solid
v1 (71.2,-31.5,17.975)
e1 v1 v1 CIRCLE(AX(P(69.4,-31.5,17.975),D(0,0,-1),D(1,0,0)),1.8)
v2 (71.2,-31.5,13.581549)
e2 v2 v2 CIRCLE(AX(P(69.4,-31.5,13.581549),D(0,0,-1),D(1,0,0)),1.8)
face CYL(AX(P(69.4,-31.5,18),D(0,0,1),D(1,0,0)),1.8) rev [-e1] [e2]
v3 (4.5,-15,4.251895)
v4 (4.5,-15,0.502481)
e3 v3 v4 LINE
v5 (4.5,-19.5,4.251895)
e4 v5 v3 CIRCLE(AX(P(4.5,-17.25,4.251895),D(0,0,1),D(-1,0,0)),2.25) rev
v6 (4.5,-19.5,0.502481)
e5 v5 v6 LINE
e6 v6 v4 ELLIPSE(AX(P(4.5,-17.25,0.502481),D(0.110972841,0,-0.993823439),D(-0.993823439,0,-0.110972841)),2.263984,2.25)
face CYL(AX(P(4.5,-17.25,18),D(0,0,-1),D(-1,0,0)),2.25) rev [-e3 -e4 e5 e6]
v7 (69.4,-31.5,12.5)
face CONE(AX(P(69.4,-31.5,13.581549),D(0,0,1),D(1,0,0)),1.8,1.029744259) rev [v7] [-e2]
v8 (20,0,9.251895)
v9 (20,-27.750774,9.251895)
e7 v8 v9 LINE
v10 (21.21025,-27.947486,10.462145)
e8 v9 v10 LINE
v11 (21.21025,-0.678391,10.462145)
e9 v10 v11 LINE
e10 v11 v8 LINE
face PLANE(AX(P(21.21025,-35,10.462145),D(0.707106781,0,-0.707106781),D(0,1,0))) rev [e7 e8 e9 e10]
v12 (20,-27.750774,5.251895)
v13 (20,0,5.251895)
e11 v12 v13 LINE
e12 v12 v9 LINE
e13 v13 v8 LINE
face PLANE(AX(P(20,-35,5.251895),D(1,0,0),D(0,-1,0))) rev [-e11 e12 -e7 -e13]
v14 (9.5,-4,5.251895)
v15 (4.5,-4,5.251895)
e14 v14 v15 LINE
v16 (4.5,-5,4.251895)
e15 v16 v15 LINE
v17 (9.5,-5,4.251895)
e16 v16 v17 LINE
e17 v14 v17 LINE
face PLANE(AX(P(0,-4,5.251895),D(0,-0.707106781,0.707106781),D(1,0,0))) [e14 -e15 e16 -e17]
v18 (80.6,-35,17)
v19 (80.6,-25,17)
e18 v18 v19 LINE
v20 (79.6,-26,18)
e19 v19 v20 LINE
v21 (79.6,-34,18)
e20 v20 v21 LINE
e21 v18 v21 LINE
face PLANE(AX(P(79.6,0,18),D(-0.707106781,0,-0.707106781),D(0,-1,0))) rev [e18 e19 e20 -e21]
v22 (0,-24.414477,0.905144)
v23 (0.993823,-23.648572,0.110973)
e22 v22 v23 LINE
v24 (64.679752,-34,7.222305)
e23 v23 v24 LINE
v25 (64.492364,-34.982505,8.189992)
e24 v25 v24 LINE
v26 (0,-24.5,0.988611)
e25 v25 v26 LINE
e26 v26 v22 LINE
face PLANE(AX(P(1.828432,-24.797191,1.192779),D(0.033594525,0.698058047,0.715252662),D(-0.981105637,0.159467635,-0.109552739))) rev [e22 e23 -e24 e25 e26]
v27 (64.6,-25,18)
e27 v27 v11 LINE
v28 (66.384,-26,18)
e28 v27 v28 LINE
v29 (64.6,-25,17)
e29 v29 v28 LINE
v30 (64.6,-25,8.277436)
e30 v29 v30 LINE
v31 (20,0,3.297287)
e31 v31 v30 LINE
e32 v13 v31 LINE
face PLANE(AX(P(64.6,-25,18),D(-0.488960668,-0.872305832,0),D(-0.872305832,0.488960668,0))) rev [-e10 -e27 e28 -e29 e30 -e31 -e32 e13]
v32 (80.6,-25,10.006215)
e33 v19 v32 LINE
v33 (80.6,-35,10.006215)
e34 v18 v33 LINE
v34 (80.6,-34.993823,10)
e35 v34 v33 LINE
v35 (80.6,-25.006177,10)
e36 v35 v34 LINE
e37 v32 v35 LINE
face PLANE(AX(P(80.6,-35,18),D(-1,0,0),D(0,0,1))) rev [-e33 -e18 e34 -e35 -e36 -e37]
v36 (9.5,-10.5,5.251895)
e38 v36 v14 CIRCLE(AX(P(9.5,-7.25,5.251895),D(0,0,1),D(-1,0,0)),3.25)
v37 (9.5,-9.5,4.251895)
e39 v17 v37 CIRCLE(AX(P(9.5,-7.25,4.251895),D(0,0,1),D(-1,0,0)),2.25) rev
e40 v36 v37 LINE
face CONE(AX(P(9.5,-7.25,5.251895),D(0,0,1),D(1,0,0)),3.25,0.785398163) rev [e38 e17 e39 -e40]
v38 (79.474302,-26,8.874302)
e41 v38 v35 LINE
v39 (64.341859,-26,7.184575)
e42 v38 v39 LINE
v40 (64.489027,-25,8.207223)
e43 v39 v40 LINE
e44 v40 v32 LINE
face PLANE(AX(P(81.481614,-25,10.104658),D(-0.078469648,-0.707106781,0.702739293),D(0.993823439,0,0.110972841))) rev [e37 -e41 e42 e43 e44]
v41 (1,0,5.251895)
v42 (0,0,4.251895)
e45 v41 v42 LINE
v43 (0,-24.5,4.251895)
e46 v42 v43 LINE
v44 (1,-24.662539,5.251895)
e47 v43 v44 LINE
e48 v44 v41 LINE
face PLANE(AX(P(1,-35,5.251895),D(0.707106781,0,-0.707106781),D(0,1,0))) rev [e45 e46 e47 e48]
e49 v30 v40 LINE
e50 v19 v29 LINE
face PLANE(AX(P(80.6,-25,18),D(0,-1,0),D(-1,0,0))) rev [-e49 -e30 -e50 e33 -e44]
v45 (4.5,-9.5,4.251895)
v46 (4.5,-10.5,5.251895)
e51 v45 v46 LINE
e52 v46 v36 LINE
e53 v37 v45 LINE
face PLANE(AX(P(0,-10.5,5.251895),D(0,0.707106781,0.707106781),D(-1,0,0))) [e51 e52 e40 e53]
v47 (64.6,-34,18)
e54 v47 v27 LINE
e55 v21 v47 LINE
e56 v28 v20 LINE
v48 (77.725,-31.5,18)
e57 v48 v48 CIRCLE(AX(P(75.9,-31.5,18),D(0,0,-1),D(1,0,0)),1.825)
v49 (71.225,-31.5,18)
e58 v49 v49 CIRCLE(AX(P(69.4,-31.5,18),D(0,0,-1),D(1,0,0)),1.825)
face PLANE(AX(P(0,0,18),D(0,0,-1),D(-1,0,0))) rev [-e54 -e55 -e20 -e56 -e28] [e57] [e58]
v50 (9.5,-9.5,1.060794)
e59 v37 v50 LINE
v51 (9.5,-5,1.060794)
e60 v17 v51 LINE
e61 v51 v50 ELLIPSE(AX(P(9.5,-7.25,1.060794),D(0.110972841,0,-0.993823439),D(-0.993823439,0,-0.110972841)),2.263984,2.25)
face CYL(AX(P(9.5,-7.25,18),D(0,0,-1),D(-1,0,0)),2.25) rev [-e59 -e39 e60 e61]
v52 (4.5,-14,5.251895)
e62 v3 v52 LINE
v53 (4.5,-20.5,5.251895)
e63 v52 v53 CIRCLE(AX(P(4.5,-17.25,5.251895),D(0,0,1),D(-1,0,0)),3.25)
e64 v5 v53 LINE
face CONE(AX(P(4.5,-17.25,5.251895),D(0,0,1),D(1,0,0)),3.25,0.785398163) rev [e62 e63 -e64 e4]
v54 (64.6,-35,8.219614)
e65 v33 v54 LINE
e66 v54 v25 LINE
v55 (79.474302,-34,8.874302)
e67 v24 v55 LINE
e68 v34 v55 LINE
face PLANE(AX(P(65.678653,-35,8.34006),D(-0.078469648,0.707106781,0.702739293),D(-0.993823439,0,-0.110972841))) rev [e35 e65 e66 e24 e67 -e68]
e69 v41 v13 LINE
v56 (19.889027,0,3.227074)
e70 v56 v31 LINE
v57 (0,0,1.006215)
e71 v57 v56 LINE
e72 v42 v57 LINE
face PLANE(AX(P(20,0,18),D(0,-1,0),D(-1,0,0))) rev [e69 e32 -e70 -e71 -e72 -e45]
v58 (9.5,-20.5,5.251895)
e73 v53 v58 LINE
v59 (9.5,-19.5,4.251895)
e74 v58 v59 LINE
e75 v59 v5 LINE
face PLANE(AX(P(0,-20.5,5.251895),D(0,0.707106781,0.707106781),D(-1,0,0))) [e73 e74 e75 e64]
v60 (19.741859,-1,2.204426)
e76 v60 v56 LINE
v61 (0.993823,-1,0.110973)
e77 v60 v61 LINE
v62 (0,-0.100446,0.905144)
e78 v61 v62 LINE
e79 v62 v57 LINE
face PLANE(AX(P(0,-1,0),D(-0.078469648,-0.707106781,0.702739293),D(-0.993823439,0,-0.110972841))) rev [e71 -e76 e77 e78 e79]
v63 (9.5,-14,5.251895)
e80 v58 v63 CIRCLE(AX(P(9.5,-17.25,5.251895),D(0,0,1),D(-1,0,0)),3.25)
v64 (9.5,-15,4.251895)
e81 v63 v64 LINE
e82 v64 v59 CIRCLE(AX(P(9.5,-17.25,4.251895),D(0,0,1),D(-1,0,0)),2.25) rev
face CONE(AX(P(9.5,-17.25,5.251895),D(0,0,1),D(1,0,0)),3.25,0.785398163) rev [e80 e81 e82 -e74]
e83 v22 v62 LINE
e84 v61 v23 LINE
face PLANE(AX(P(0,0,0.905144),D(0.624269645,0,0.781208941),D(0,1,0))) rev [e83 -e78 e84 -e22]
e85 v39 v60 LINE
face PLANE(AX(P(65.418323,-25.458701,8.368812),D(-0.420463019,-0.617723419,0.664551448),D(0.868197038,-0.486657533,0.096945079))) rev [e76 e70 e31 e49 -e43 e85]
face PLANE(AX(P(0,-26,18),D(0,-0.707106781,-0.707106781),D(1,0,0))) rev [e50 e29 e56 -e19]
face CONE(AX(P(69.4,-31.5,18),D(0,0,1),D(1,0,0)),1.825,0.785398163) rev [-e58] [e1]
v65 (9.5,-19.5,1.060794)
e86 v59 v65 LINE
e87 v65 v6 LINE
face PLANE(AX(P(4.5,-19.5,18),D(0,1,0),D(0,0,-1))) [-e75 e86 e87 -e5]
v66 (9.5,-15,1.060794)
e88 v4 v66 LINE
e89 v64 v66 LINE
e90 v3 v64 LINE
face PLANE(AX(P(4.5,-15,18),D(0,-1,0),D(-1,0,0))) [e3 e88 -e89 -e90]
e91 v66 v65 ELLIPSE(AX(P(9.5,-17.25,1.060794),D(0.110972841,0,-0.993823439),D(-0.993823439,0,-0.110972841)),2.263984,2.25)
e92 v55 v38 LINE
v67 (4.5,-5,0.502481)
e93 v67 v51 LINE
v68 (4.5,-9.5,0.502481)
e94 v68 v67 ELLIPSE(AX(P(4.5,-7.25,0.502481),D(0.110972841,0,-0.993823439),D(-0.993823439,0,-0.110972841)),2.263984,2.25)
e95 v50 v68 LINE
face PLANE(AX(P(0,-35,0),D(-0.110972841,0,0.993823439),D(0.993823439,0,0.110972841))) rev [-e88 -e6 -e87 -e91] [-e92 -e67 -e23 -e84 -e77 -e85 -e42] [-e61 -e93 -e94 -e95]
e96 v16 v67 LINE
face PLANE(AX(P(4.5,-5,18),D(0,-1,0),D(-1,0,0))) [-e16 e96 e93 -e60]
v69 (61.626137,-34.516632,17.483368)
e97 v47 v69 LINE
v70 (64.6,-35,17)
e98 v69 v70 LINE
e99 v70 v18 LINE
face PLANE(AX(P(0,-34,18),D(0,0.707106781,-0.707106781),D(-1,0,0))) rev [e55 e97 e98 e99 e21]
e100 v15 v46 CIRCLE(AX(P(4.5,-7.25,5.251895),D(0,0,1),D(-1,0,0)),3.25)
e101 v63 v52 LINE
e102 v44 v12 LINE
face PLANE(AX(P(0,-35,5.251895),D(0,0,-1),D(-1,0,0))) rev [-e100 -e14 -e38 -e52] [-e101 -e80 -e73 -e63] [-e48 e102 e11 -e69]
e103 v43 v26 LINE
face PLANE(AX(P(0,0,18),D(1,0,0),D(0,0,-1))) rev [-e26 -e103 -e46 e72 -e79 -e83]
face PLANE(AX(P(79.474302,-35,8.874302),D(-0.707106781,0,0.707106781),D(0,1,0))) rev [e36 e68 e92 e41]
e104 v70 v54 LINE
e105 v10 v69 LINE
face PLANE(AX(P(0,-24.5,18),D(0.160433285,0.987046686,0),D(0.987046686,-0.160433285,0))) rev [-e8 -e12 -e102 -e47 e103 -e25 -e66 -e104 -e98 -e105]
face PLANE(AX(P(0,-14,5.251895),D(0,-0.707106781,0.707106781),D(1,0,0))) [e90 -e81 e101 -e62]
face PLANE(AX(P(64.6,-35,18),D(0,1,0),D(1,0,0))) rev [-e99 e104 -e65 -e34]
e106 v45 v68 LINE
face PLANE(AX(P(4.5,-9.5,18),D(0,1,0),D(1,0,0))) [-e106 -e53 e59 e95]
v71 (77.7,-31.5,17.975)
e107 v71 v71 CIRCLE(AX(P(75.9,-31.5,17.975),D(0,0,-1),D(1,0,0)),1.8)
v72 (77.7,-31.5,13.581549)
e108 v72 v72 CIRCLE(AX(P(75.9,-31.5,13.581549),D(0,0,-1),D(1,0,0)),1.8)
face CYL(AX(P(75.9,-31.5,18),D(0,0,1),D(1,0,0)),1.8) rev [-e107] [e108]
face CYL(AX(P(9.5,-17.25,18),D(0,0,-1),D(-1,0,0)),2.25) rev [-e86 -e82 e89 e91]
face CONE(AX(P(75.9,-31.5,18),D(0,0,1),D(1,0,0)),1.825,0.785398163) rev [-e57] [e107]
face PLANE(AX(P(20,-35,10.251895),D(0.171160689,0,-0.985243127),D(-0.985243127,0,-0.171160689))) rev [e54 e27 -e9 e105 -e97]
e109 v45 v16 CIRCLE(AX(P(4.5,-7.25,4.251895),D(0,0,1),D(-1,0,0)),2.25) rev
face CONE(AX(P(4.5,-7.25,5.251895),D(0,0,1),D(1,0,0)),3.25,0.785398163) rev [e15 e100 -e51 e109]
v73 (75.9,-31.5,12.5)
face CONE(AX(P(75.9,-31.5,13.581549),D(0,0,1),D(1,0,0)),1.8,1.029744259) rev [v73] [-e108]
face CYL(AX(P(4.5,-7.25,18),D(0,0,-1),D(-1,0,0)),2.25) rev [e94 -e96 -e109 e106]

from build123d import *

# Parameters (mm, degrees)
BOSS_EXTRUDE1_DEPTH            = 18
CUT_EXTRUDE1_DEPTH             = 90.695930788
CHAMFER1_SIZE                  = 1
CHAMFER1_SIZE_2                = 1.13269448
CHAMFER1_SIZE_3                = 1.059024281
CHAMFER1_SIZE_4                = 0.982660718
CHAMFER1_SIZE_5                = 0.90514425
CHAMFER1_SIZE_6                = 1.228376825
M3_CLEARANCE_HOLE1_D           = 3.6
M3_CLEARANCE_HOLE1_DEPTH       = 4.418450886
M3_CLEARANCE_HOLE1_CSINK_D     = 3.65
M3_CLEARANCE_HOLE1_CSINK_ANGLE = 90
M3_CLEARANCE_HOLE1_TIP         = 1.081549114


with BuildPart() as part:
    # Sketch1 → Boss-Extrude1 (new body)
    with BuildSketch(Plane.XY):
        Polygon((0, 0), (0, 24.5), (64.6, 35), (80.6, 35), (80.6, 25), (64.6, 25), (20, 0), align=None)
        with BuildLine():
            Line((4.5, 19.5), (9.5, 19.5))
            ThreePointArc((9.5, 19.5), (11.75, 17.25), (9.5, 15))
            Line((9.5, 15), (4.5, 15))
            ThreePointArc((4.5, 15), (2.25, 17.25), (4.5, 19.5))
        make_face(mode=Mode.SUBTRACT)
        with BuildLine():
            Line((4.5, 9.5), (9.5, 9.5))
            ThreePointArc((9.5, 9.5), (11.75, 7.25), (9.5, 5))
            Line((9.5, 5), (4.5, 5))
            ThreePointArc((4.5, 5), (2.25, 7.25), (4.5, 9.5))
        make_face(mode=Mode.SUBTRACT)
    extrude(amount=BOSS_EXTRUDE1_DEPTH)

    # Sketch2 → Cut-Extrude1 (cut, through all)
    with BuildSketch(Plane.XZ):
        Polygon((0, 5.251895463), (20, 5.251895463), (20, 10.251895463), (64.6, 18), (0, 18), align=None)
        Polygon((0, 0), (80.6, 9), (80.6, 0), align=None)
    extrude(amount=-CUT_EXTRUDE1_DEPTH, mode=Mode.SUBTRACT)

    # Chamfer1
    # the kernel refuses this chamfer: 1.228376825, 1.13269448, 1.059024281, 1, 0.982660718, 0.90514425 mm, written as the material it takes off along each edge
    with BuildSketch(Plane(origin=(83.171682988, 25, 18), x_dir=(0, 0, -1), z_dir=(-1, 0, 0))) as chamfer1_piece_1_section:
        Polygon((CHAMFER1_SIZE, 0), (0, -CHAMFER1_SIZE), (0, 0), align=None)
    chamfer1_piece_1 = extrude(amount=26.286731952, mode=Mode.PRIVATE)
    chamfer1_piece_1 = split(chamfer1_piece_1, bisect_by=Plane(origin=(78.731517938, 32.921254449, 18), z_dir=(0.4889606682714293, -0.87230583219623, 0)), keep=Keep.TOP, mode=Mode.PRIVATE)
    add(chamfer1_piece_1, mode=Mode.SUBTRACT)
    with BuildSketch(Plane(origin=(80.6, 37.571682988, 18), x_dir=(0, 0, -1), z_dir=(0, -1, 0))) as chamfer1_piece_2:
        Polygon((CHAMFER1_SIZE, 0), (0, -CHAMFER1_SIZE), (0, 0), align=None)
    extrude(amount=15.143365976, mode=Mode.SUBTRACT)
    with BuildSketch(Plane(origin=(56.884951036, 35, 18), x_dir=(0, 0, -1), z_dir=(1, 0, 0))) as chamfer1_piece_3:
        Polygon((CHAMFER1_SIZE, 0), (0, -CHAMFER1_SIZE), (0, 0), align=None)
    extrude(amount=26.286731952, mode=Mode.SUBTRACT)
    with BuildSketch(Plane(origin=(9.5, 9.5, 5.251895463), x_dir=(0, 1, 0), z_dir=(-1, 0, 0)), Plane(origin=(4.5, 15, 5.251895463), x_dir=(0, -1, 0), z_dir=(1, 0, 0)), Plane(origin=(9.5, 19.5, 5.251895463), x_dir=(0, 1, 0), z_dir=(-1, 0, 0)), Plane(origin=(4.5, 5, 5.251895463), x_dir=(0, -1, 0), z_dir=(1, 0, 0))) as chamfer1_piece_4:
        Polygon((CHAMFER1_SIZE, 0), (0, CHAMFER1_SIZE), (0, 0), align=None)
    extrude(amount=5, mode=Mode.SUBTRACT)
    with BuildSketch(Plane(origin=(0, -2.571682988, 5.251895463), x_dir=(0, 0, -1), z_dir=(0, 1, 0))) as chamfer1_piece_5:
        Polygon((CHAMFER1_SIZE, 0), (0, -CHAMFER1_SIZE), (0, 0), align=None)
    extrude(amount=29.643365976, mode=Mode.SUBTRACT)
    with BuildSketch(Plane(origin=(4.5, 17.25, 5.251895463), x_dir=(0, -1, 0), z_dir=(1, 0, 0))) as chamfer1_piece_6:
        Polygon((2.25 + CHAMFER1_SIZE, 0), (2.25, CHAMFER1_SIZE), (2.25, 0), align=None)
    revolve(axis=Axis((4.5, 17.25, 5.251895463), (0, 0, -1)), revolution_arc=180, mode=Mode.SUBTRACT)
    with BuildSketch(Plane(origin=(9.5, 17.25, 5.251895463), x_dir=(0, 1, 0), z_dir=(-1, 0, 0))) as chamfer1_piece_7:
        Polygon((2.25 + CHAMFER1_SIZE, 0), (2.25, CHAMFER1_SIZE), (2.25, 0), align=None)
    revolve(axis=Axis((9.5, 17.25, 5.251895463), (0, 0, -1)), revolution_arc=180, mode=Mode.SUBTRACT)
    with BuildSketch(Plane(origin=(4.5, 7.25, 5.251895463), x_dir=(0, -1, 0), z_dir=(1, 0, 0))) as chamfer1_piece_8:
        Polygon((2.25 + CHAMFER1_SIZE, 0), (2.25, CHAMFER1_SIZE), (2.25, 0), align=None)
    revolve(axis=Axis((4.5, 7.25, 5.251895463), (0, 0, -1)), revolution_arc=180, mode=Mode.SUBTRACT)
    with BuildSketch(Plane(origin=(9.5, 7.25, 5.251895463), x_dir=(0, 1, 0), z_dir=(-1, 0, 0))) as chamfer1_piece_9:
        Polygon((2.25 + CHAMFER1_SIZE, 0), (2.25, CHAMFER1_SIZE), (2.25, 0), align=None)
    revolve(axis=Axis((9.5, 7.25, 5.251895463), (0, 0, -1)), revolution_arc=180, mode=Mode.SUBTRACT)
    with BuildSketch(Plane(origin=(80.6, 22.078920721, 9), x_dir=(-0.9938234393712555, 0, -0.11097284062458136), z_dir=(0, 1, 0))) as chamfer1_piece_10:
        Polygon((CHAMFER1_SIZE_2, 0), (-CHAMFER1_SIZE * 0.110972840625, CHAMFER1_SIZE * 0.993823439371), (0, 0), align=None)
    extrude(amount=15.842158559, mode=Mode.SUBTRACT)
    with BuildSketch(Plane(origin=(17.632153336, -1.327268309, 1.968850869), x_dir=(-0.48365166299246226, 0.873592837550041, -0.05400576882050032), z_dir=(0.8681970384240761, 0.48665753274892154, 0.09694507873221696))) as chamfer1_piece_11_section:
        Polygon((CHAMFER1_SIZE, 0), (-CHAMFER1_SIZE_3 * 0.0542613542965, CHAMFER1_SIZE_3 * 0.998526767225), (0, 0), align=None)
    chamfer1_piece_11 = extrude(amount=56.825456831, mode=Mode.PRIVATE)
    chamfer1_piece_11 = split(chamfer1_piece_11, bisect_by=Plane(origin=(17.632153336, 25, 1.968850869), z_dir=(0, -1, 0)), keep=Keep.TOP, mode=Mode.PRIVATE)
    add(chamfer1_piece_11, mode=Mode.SUBTRACT)
    with BuildSketch(Plane(origin=(72.169278028, 36.230300608, 8.058604246), x_dir=(0.15848267298847146, -0.987203157180204, 0.017696576388291016), z_dir=(-0.9811056370269924, -0.15946763450129123, -0.10955273862584283))) as chamfer1_piece_12:
        Polygon((CHAMFER1_SIZE, 0), (CHAMFER1_SIZE_4 * 0.0178037373512, CHAMFER1_SIZE_4 * 0.999841500402), (0, 0), align=None)
    extrude(amount=76.130813937, mode=Mode.SUBTRACT)
    with BuildSketch(Plane(origin=(0, -2.571682988, 0), x_dir=(0, 0, 1), z_dir=(0, 1, 0))) as chamfer1_piece_13:
        Polygon((CHAMFER1_SIZE_5, 0), (CHAMFER1_SIZE * 0.110972840625, CHAMFER1_SIZE * 0.993823439371), (0, 0), align=None)
    extrude(amount=29.643365976, mode=Mode.SUBTRACT)
    with BuildSketch(Plane(origin=(20, -3.172174758, 10.251895463), x_dir=(0.9852431265776485, 0, 0.17116068921192124), z_dir=(0, 1, 0))) as chamfer1_piece_14:
        Polygon((CHAMFER1_SIZE_6, 0), (-CHAMFER1_SIZE * 0.171160689212, CHAMFER1_SIZE * 0.985243126578), (0, 0), align=None)
    extrude(amount=34.095123509, mode=Mode.SUBTRACT)
    # the kernel refuses this chamfer: 1.228376825, 1.13269448, 1.059024281, 1, 0.982660718, 0.90514425 mm, written as the material it takes off along each edge
    with BuildSketch(Plane(origin=(-1.561975393, 0, -0.174414126), x_dir=(-0.11097284062458186, 0, 0.9938234393712553), z_dir=(0.9938234393712554, 0, 0.11097284062458188))) as chamfer1_2_piece_1:
        Polygon((CHAMFER1_SIZE, 0), (0, -CHAMFER1_SIZE), (0, 0), align=None)
    extrude(amount=22.212831842, mode=Mode.SUBTRACT)
    with BuildSketch(Plane(origin=(82.030100508, 25, 9.159688642), x_dir=(-0.11097284062458178, -3.5527136788004942e-15, 0.9938234393712553), z_dir=(-0.9938234393712554, 0, -0.11097284062458179))) as chamfer1_2_piece_2_section:
        Polygon((CHAMFER1_SIZE, 0), (0, CHAMFER1_SIZE), (0, 0), align=None)
    chamfer1_2_piece_2 = extrude(amount=22.164943744, mode=Mode.PRIVATE)
    chamfer1_2_piece_2 = split(chamfer1_2_piece_2, bisect_by=Plane(origin=(79.195166365, 29.16494468, 13.640367099), z_dir=(0.42046301876729836, -0.6177234194276358, -0.6645514479253808)), keep=Keep.TOP, mode=Mode.PRIVATE)
    add(chamfer1_2_piece_2, mode=Mode.SUBTRACT)
    with BuildSketch(Plane(origin=(82.030100508, 35, 9.159688642), x_dir=(-0.11097284062458186, -7.105427357601003e-15, 0.9938234393712553), z_dir=(-0.9938234393712554, 0, -0.11097284062458188))) as chamfer1_2_piece_3:
        Polygon((CHAMFER1_SIZE, 0), (0, -CHAMFER1_SIZE), (0, 0), align=None)
    extrude(amount=18.982611683, mode=Mode.SUBTRACT)

    # M3 Clearance Hole1
    with Locations(Plane.XY.offset(18)):
        with Locations((69.4, 31.5), (75.9, 31.5)):
            CounterSinkHole(M3_CLEARANCE_HOLE1_D / 2, M3_CLEARANCE_HOLE1_CSINK_D / 2, depth=M3_CLEARANCE_HOLE1_DEPTH, counter_sink_angle=M3_CLEARANCE_HOLE1_CSINK_ANGLE)
            with Locations((0, 0, -(M3_CLEARANCE_HOLE1_DEPTH + M3_CLEARANCE_HOLE1_TIP / 2))):  # 118° drill point
                Cone(0, M3_CLEARANCE_HOLE1_D / 2, M3_CLEARANCE_HOLE1_TIP, mode=Mode.SUBTRACT)


with BuildPart() as body_2:
    # Mirror2: mirrored copy
    add(part.part.mirror(Plane(origin=(20, 0, 18), x_dir=(0, 0, 1), z_dir=(0, 1, 0))))


solid = body_2.part
